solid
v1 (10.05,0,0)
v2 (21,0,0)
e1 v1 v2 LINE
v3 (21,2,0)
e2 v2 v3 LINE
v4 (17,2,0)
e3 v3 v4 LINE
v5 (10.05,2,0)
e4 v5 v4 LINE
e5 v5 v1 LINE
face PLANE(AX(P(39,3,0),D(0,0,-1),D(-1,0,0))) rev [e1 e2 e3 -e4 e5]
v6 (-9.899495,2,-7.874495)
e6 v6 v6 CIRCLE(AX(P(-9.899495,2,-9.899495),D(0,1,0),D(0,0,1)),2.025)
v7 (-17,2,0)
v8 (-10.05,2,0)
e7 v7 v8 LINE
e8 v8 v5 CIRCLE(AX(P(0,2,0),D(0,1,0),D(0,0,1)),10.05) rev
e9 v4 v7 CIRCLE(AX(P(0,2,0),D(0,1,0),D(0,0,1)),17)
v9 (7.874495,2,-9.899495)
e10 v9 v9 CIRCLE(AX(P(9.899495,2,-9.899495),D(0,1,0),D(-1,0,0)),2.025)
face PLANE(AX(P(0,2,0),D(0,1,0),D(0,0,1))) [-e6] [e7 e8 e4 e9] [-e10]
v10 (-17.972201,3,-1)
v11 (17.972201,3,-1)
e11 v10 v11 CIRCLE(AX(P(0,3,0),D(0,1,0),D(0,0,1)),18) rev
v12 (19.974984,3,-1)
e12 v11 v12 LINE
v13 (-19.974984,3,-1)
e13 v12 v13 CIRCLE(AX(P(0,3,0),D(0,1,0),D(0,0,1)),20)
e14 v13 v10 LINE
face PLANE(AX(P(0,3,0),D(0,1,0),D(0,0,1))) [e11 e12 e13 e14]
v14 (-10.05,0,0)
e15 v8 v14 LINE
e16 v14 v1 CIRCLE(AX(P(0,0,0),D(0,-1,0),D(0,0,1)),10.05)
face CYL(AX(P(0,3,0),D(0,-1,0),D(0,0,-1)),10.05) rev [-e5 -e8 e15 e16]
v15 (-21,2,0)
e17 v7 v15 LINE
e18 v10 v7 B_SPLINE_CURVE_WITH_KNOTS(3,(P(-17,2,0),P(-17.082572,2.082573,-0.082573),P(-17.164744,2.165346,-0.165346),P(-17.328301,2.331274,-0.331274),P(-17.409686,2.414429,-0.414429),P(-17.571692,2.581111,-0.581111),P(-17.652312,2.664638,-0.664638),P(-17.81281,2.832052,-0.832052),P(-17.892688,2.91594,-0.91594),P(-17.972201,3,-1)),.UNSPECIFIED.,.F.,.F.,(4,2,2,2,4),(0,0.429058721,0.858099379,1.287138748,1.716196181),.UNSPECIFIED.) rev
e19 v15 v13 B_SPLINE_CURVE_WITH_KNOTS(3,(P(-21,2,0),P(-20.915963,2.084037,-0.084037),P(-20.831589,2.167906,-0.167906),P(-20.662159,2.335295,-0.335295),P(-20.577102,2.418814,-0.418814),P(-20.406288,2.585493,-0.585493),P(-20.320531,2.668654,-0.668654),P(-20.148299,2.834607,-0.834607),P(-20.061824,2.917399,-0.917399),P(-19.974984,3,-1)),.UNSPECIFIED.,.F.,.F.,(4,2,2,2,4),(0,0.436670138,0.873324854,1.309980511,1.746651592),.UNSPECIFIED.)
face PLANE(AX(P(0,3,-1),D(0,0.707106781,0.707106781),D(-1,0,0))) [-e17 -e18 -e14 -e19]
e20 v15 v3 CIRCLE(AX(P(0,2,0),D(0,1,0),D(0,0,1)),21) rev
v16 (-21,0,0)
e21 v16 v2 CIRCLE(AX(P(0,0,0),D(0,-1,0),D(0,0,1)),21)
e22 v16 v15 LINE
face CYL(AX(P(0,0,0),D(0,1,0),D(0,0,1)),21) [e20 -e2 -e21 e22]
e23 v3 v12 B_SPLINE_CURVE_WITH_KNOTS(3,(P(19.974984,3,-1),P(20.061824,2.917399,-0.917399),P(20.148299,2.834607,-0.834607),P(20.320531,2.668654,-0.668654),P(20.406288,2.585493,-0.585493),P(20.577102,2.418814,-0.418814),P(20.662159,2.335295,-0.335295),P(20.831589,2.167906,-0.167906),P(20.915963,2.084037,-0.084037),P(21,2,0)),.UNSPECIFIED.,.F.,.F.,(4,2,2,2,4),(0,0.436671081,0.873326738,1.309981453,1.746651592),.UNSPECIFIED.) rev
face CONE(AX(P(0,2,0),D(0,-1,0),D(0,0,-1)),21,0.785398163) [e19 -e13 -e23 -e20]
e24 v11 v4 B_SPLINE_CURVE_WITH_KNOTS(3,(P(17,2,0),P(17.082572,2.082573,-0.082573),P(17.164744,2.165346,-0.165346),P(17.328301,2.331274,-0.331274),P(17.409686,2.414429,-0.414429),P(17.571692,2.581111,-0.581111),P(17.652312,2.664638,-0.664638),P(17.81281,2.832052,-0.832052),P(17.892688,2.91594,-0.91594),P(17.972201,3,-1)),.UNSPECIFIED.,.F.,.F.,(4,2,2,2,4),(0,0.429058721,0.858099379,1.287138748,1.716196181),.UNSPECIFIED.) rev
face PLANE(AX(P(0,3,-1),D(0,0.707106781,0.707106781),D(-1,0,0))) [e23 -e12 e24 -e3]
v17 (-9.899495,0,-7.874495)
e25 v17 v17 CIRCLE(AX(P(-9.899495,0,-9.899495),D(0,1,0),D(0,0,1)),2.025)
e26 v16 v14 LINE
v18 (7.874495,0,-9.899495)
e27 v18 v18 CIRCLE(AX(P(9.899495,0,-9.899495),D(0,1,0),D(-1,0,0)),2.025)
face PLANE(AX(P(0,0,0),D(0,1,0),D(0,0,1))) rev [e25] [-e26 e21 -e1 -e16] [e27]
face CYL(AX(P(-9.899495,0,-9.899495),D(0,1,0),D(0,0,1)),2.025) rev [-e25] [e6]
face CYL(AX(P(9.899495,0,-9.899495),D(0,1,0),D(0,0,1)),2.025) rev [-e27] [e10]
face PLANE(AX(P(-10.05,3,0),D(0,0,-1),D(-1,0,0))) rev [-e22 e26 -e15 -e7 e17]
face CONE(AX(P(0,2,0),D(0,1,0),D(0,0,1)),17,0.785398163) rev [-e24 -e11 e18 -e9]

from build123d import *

# Parameters (mm, degrees)
EXTRUDE_1_DEPTH               = 3
HOLE_WIZARD_M2_1_AT_2_COUNT   = 2
HOLE_WIZARD_M2_1_AT_2_PITCH   = 21
PATTERN_LINEAR_1_COUNT        = 3
PATTERN_LINEAR_1_PITCH        = 33
PATTERN_LINEAR_2_COUNT        = 3
PATTERN_LINEAR_2_PITCH        = 10.5
PATTERN_LINEAR_3_COUNT        = 2
PATTERN_LINEAR_3_PITCH        = 31.5
HOLE_WIZARD_M2_1_2_AT_2_COUNT = 2
HOLE_WIZARD_M2_1_2_AT_2_PITCH = 16.970562748
SKETCH_8_R                    = 17
CUT_EXTRUDE_1_DEPTH           = 1
SKETCH_9_R                    = 2.025
CUT_EXTRUDE_2_DEPTH           = 75.994999833
PATTERN_CIRCULAR_1_COUNT      = 2
PATTERN_CIRCULAR_1_ANGLE      = 90
FILLET_1_R                    = 4
CUT_EXTRUDE_3_DEPTH           = 76.028327984
CHAMFER_2_SIZE                = 1


with BuildPart() as part:
    # ｽｹｯﾁ1 → ﾎﾞｽ - 押し出し1 (new body)
    with BuildSketch(Plane(origin=(0, 0, 0), x_dir=(1, 0, 0), z_dir=(0, 1, 0))):
        with BuildLine():
            Line((-10.05, 0), (-39, 0))
            Line((-39, 0), (-47.5, 8.5))
            Line((-47.5, 8.5), (-47.5, 58))
            Line((-47.5, 58), (47.5, 58))
            Line((47.5, 58), (47.5, 8.5))
            Line((47.5, 8.5), (39, 0))
            Line((39, 0), (10.05, 0))
            ThreePointArc((10.05, 0), (0, 10.05), (-10.05, 0))
        make_face()
    extrude(amount=EXTRUDE_1_DEPTH)

    # ｽｹｯﾁ3 → Hole Wizard M2 _1 (revolve, cut)
    with BuildSketch(Plane(origin=(-43.5, 3, -54), x_dir=(0, 0, 1), z_dir=(1, 0, 0))):
        Polygon((0, 0), (0, 4.63090365), (1.05, 4), (1.05, 1), (2, 1), (2, 0), align=None)
    hole_wizard_m2_1 = revolve(axis=Axis((-43.5, 9.35, -54), (0, -1, 0)), mode=Mode.SUBTRACT)

    # Hole Wizard M2 _1 at 2: Hole Wizard M2 _1 ×2
    with Locations(*[(i * HOLE_WIZARD_M2_1_AT_2_PITCH, 0, 0) for i in range(1, HOLE_WIZARD_M2_1_AT_2_COUNT)]):
        add(hole_wizard_m2_1, mode=Mode.SUBTRACT)

    # 直線ﾊﾟﾀｰﾝ1: Hole Wizard M2 _1 ×3
    with Locations(*[(i * PATTERN_LINEAR_1_PITCH, 0, 0) for i in range(1, PATTERN_LINEAR_1_COUNT)]):
        add(hole_wizard_m2_1, mode=Mode.SUBTRACT)

    # 直線ﾊﾟﾀｰﾝ1 copy 1 sketch → 直線ﾊﾟﾀｰﾝ1 copy 1 (revolve, cut)
    with BuildSketch(Plane(origin=(10.5, 3, -54), x_dir=(0, 0, 1), z_dir=(1, 0, 0))):
        Polygon((0, 0), (0, 4.63090365), (1.05, 4), (1.05, 1), (2, 1), (2, 0), align=None)
    revolve(axis=Axis((10.5, 9.35, -54), (0, -1, 0)), mode=Mode.SUBTRACT)

    # 直線ﾊﾟﾀｰﾝ1 copy 2 sketch → 直線ﾊﾟﾀｰﾝ1 copy 2 (revolve, cut)
    with BuildSketch(Plane(origin=(43.5, 3, -54), x_dir=(0, 0, 1), z_dir=(1, 0, 0))):
        Polygon((0, 0), (0, 4.63090365), (1.05, 4), (1.05, 1), (2, 1), (2, 0), align=None)
    revolve(axis=Axis((43.5, 9.35, -54), (0, -1, 0)), mode=Mode.SUBTRACT)

    # 直線ﾊﾟﾀｰﾝ2: Hole Wizard M2 _1 ×3
    with Locations(*[(0, 0, i * PATTERN_LINEAR_2_PITCH) for i in range(1, PATTERN_LINEAR_2_COUNT)]):
        add(hole_wizard_m2_1, mode=Mode.SUBTRACT)

    # 直線ﾊﾟﾀｰﾝ2 copy 1 sketch → 直線ﾊﾟﾀｰﾝ2 copy 1 (revolve, cut)
    with BuildSketch(Plane(origin=(-22.5, 3, -43.5), x_dir=(0, 0, 1), z_dir=(1, 0, 0))):
        Polygon((0, 0), (0, 4.63090365), (1.05, 4), (1.05, 1), (2, 1), (2, 0), align=None)
    revolve(axis=Axis((-22.5, 9.35, -43.5), (0, -1, 0)), mode=Mode.SUBTRACT)

    # 直線ﾊﾟﾀｰﾝ2 copy 2 sketch → 直線ﾊﾟﾀｰﾝ2 copy 2 (revolve, cut)
    with BuildSketch(Plane(origin=(-22.5, 3, -33), x_dir=(0, 0, 1), z_dir=(1, 0, 0))):
        Polygon((0, 0), (0, 4.63090365), (1.05, 4), (1.05, 1), (2, 1), (2, 0), align=None)
    revolve(axis=Axis((-22.5, 9.35, -33), (0, -1, 0)), mode=Mode.SUBTRACT)

    # 直線ﾊﾟﾀｰﾝ2 copy 3 sketch → 直線ﾊﾟﾀｰﾝ2 copy 3 (revolve, cut)
    with BuildSketch(Plane(origin=(-10.5, 3, -43.5), x_dir=(0, 0, 1), z_dir=(1, 0, 0))):
        Polygon((0, 0), (0, 4.63090365), (1.05, 4), (1.05, 1), (2, 1), (2, 0), align=None)
    revolve(axis=Axis((-10.5, 9.35, -43.5), (0, -1, 0)), mode=Mode.SUBTRACT)

    # 直線ﾊﾟﾀｰﾝ2 copy 4 sketch → 直線ﾊﾟﾀｰﾝ2 copy 4 (revolve, cut)
    with BuildSketch(Plane(origin=(-10.5, 3, -33), x_dir=(0, 0, 1), z_dir=(1, 0, 0))):
        Polygon((0, 0), (0, 4.63090365), (1.05, 4), (1.05, 1), (2, 1), (2, 0), align=None)
    revolve(axis=Axis((-10.5, 9.35, -33), (0, -1, 0)), mode=Mode.SUBTRACT)

    # 直線ﾊﾟﾀｰﾝ2 copy 5 sketch → 直線ﾊﾟﾀｰﾝ2 copy 5 (revolve, cut)
    with BuildSketch(Plane(origin=(22.5, 3, -43.5), x_dir=(0, 0, 1), z_dir=(1, 0, 0))):
        Polygon((0, 0), (0, 4.63090365), (1.05, 4), (1.05, 1), (2, 1), (2, 0), align=None)
    revolve(axis=Axis((22.5, 9.35, -43.5), (0, -1, 0)), mode=Mode.SUBTRACT)

    # 直線ﾊﾟﾀｰﾝ2 copy 6 sketch → 直線ﾊﾟﾀｰﾝ2 copy 6 (revolve, cut)
    with BuildSketch(Plane(origin=(22.5, 3, -33), x_dir=(0, 0, 1), z_dir=(1, 0, 0))):
        Polygon((0, 0), (0, 4.63090365), (1.05, 4), (1.05, 1), (2, 1), (2, 0), align=None)
    revolve(axis=Axis((22.5, 9.35, -33), (0, -1, 0)), mode=Mode.SUBTRACT)

    # 直線ﾊﾟﾀｰﾝ2 copy 7 sketch → 直線ﾊﾟﾀｰﾝ2 copy 7 (revolve, cut)
    with BuildSketch(Plane(origin=(10.5, 3, -43.5), x_dir=(0, 0, 1), z_dir=(1, 0, 0))):
        Polygon((0, 0), (0, 4.63090365), (1.05, 4), (1.05, 1), (2, 1), (2, 0), align=None)
    revolve(axis=Axis((10.5, 9.35, -43.5), (0, -1, 0)), mode=Mode.SUBTRACT)

    # 直線ﾊﾟﾀｰﾝ2 copy 8 sketch → 直線ﾊﾟﾀｰﾝ2 copy 8 (revolve, cut)
    with BuildSketch(Plane(origin=(10.5, 3, -33), x_dir=(0, 0, 1), z_dir=(1, 0, 0))):
        Polygon((0, 0), (0, 4.63090365), (1.05, 4), (1.05, 1), (2, 1), (2, 0), align=None)
    revolve(axis=Axis((10.5, 9.35, -33), (0, -1, 0)), mode=Mode.SUBTRACT)

    # 直線ﾊﾟﾀｰﾝ2 copy 9 sketch → 直線ﾊﾟﾀｰﾝ2 copy 9 (revolve, cut)
    with BuildSketch(Plane(origin=(43.5, 3, -43.5), x_dir=(0, 0, 1), z_dir=(1, 0, 0))):
        Polygon((0, 0), (0, 4.63090365), (1.05, 4), (1.05, 1), (2, 1), (2, 0), align=None)
    revolve(axis=Axis((43.5, 9.35, -43.5), (0, -1, 0)), mode=Mode.SUBTRACT)

    # 直線ﾊﾟﾀｰﾝ2 copy 10 sketch → 直線ﾊﾟﾀｰﾝ2 copy 10 (revolve, cut)
    with BuildSketch(Plane(origin=(43.5, 3, -33), x_dir=(0, 0, 1), z_dir=(1, 0, 0))):
        Polygon((0, 0), (0, 4.63090365), (1.05, 4), (1.05, 1), (2, 1), (2, 0), align=None)
    revolve(axis=Axis((43.5, 9.35, -33), (0, -1, 0)), mode=Mode.SUBTRACT)

    # 直線ﾊﾟﾀｰﾝ3: Hole Wizard M2 _1 ×2
    with Locations(*[(0, 0, i * PATTERN_LINEAR_3_PITCH) for i in range(1, PATTERN_LINEAR_3_COUNT)]):
        add(hole_wizard_m2_1, mode=Mode.SUBTRACT)

    # 直線ﾊﾟﾀｰﾝ3 copy 1 sketch → 直線ﾊﾟﾀｰﾝ3 copy 1 (revolve, cut)
    with BuildSketch(Plane(origin=(-22.5, 3, -22.5), x_dir=(0, 0, 1), z_dir=(1, 0, 0))):
        Polygon((0, 0), (0, 4.63090365), (1.05, 4), (1.05, 1), (2, 1), (2, 0), align=None)
    revolve(axis=Axis((-22.5, 9.35, -22.5), (0, -1, 0)), mode=Mode.SUBTRACT)

    # ｽｹｯﾁ5 → Hole Wizard M2 _1 2 (revolve, cut)
    with BuildSketch(Plane(origin=(-10.5, 3, -22.5), x_dir=(0, 0, 1), z_dir=(1, 0, 0))):
        Polygon((0, 0), (0, 6.480688495), (0.8, 6), (0.8, 0), align=None)
    hole_wizard_m2_1_2 = revolve(axis=Axis((-10.5, 9.35, -22.5), (0, -1, 0)), mode=Mode.SUBTRACT)

    # Hole Wizard M2 _1 2 at 2: Hole Wizard M2 _1 2 ×2
    with Locations(*[Vector(-0.7071067811865469, 0, 0.7071067811865482) * (i * HOLE_WIZARD_M2_1_2_AT_2_PITCH) for i in range(1, HOLE_WIZARD_M2_1_2_AT_2_COUNT)]):
        add(hole_wizard_m2_1_2, mode=Mode.SUBTRACT)

    # ｽｹｯﾁ7 → M2 なべ頭ねじ用座ぐり穴2 (revolve, cut)
    with BuildSketch(Plane(origin=(-43.5, 3, -12), x_dir=(0, 0, 1), z_dir=(1, 0, 0))):
        Polygon((0, 0), (0, 6.63090365), (1.05, 6), (1.05, 1), (2, 1), (2, 0), align=None)
    hole_wizard_m2_2 = revolve(axis=Axis((-43.5, 9.35, -12), (0, -1, 0)), mode=Mode.SUBTRACT)

    # ﾐﾗｰ1: Hole Wizard M2 _1 2, M2 なべ頭ねじ用座ぐり穴2 across plane
    add(hole_wizard_m2_1_2.mirror(Plane(origin=(0, 0, 0), x_dir=(0, 0, 1), z_dir=(1, 0, 0))), mode=Mode.SUBTRACT)
    add(hole_wizard_m2_2.mirror(Plane(origin=(0, 0, 0), x_dir=(0, 0, 1), z_dir=(1, 0, 0))), mode=Mode.SUBTRACT)

    # ﾐﾗｰ1 copy 1 sketch → ﾐﾗｰ1 copy 1 (revolve, cut)
    with BuildSketch(Plane(origin=(43.5, 3, -22.5), x_dir=(0, 0, 1), z_dir=(-1, 0, 0))):
        Polygon((0, 0), (0, -4.63090365), (1.05, -4), (1.05, -1), (2, -1), (2, 0), align=None)
    revolve(axis=Axis((43.5, 9.35, -22.5), (0, 1, 0)), mode=Mode.SUBTRACT)

    # ﾐﾗｰ1 copy 2 sketch → ﾐﾗｰ1 copy 2 (revolve, cut)
    with BuildSketch(Plane(origin=(22.5, 3, -22.5), x_dir=(0, 0, 1), z_dir=(-1, 0, 0))):
        Polygon((0, 0), (0, -4.63090365), (1.05, -4), (1.05, -1), (2, -1), (2, 0), align=None)
    revolve(axis=Axis((22.5, 9.35, -22.5), (0, 1, 0)), mode=Mode.SUBTRACT)

    # ﾐﾗｰ1 copy 3 sketch → ﾐﾗｰ1 copy 3 (revolve, cut)
    with BuildSketch(Plane(origin=(43.5, 3, -54), x_dir=(0, 0, 1), z_dir=(-1, 0, 0))):
        Polygon((0, 0), (0, -4.63090365), (1.05, -4), (1.05, -1), (2, -1), (2, 0), align=None)
    revolve(axis=Axis((43.5, 9.35, -54), (0, 1, 0)), mode=Mode.SUBTRACT)

    # ﾐﾗｰ1 copy 4 sketch → ﾐﾗｰ1 copy 4 (revolve, cut)
    with BuildSketch(Plane(origin=(22.5, 3, -54), x_dir=(0, 0, 1), z_dir=(-1, 0, 0))):
        Polygon((0, 0), (0, -4.63090365), (1.05, -4), (1.05, -1), (2, -1), (2, 0), align=None)
    revolve(axis=Axis((22.5, 9.35, -54), (0, 1, 0)), mode=Mode.SUBTRACT)

    # ﾐﾗｰ1 copy 5 sketch → ﾐﾗｰ1 copy 5 (revolve, cut)
    with BuildSketch(Plane(origin=(22.5, 3, -10.5), x_dir=(0, 0, 1), z_dir=(-1, 0, 0))):
        Polygon((0, 0), (0, -6.480688495), (0.8, -6), (0.8, 0), align=None)
    revolve(axis=Axis((22.5, 9.35, -10.5), (0, 1, 0)), mode=Mode.SUBTRACT)

    # ｽｹｯﾁ8 → ｶｯﾄ - 押し出し1 (cut)
    with BuildSketch(Plane(origin=(0, 3, 0), x_dir=(1, 0, 0), z_dir=(0, 1, 0))):
        Circle(SKETCH_8_R)
    extrude(amount=-CUT_EXTRUDE_1_DEPTH, mode=Mode.SUBTRACT)

    # ｽｹｯﾁ9 → ｶｯﾄ - 押し出し2 (cut, through all)
    with BuildSketch(Plane(origin=(0, 2, 0), x_dir=(1, 0, 0), z_dir=(0, 1, 0))):
        with Locations(Location((-9.899494937, 9.899494937, 0), (0, 0, 270))):
            Circle(SKETCH_9_R)
    cut_extrude_2 = extrude(amount=-CUT_EXTRUDE_2_DEPTH, mode=Mode.SUBTRACT)

    # 円形ﾊﾟﾀｰﾝ1: ｶｯﾄ - 押し出し2 ×2 about axis
    pattern_circular_1_axis = Axis((0, 3, 0), (0, -1, 0))
    for i in range(1, PATTERN_CIRCULAR_1_COUNT):
        add(cut_extrude_2.rotate(pattern_circular_1_axis, i * PATTERN_CIRCULAR_1_ANGLE / (PATTERN_CIRCULAR_1_COUNT - 1)), mode=Mode.SUBTRACT)

    # ﾌｨﾚｯﾄ1
    fillet_1_edges = [part.edges().sort_by_distance(p)[0] for p in [
        (-47.5, 1.5, -8.5),
        (-47.5, 1.5, -58),
        (47.5, 1.5, -58),
        (47.5, 1.5, -8.5),
        (39, 1.5, 0),
        (-39, 1.5, 0),
    ]]
    fillet(fillet_1_edges, radius=FILLET_1_R)

    # ｽｹｯﾁ10 → ｶｯﾄ - 押し出し3 (cut, through all)
    with BuildSketch(Plane(origin=(0, 3, 0), x_dir=(1, 0, 0), z_dir=(0, 1, 0))):
        with BuildLine():
            Line((-47.5, 0), (-21, 0))
            ThreePointArc((-21, 0), (0, 21), (21, 0))
            Line((21, 0), (47.5, 0))
            Line((47.5, 0), (47.5, 58))
            Line((47.5, 58), (-47.5, 58))
            Line((-47.5, 58), (-47.5, 0))
        make_face()
    extrude(amount=-CUT_EXTRUDE_3_DEPTH, mode=Mode.SUBTRACT)

    # 面取り2
    chamfer_2_edges = [part.edges().sort_by_distance(p)[0] for p in [
        (19, 3, 0),
        (0, 3, -17),
        (-19, 3, 0),
        (0, 3, -21),
    ]]
    chamfer(chamfer_2_edges, length=CHAMFER_2_SIZE - 0.0001)  # a hair under: the kernel refuses the full size


solid = part.part
